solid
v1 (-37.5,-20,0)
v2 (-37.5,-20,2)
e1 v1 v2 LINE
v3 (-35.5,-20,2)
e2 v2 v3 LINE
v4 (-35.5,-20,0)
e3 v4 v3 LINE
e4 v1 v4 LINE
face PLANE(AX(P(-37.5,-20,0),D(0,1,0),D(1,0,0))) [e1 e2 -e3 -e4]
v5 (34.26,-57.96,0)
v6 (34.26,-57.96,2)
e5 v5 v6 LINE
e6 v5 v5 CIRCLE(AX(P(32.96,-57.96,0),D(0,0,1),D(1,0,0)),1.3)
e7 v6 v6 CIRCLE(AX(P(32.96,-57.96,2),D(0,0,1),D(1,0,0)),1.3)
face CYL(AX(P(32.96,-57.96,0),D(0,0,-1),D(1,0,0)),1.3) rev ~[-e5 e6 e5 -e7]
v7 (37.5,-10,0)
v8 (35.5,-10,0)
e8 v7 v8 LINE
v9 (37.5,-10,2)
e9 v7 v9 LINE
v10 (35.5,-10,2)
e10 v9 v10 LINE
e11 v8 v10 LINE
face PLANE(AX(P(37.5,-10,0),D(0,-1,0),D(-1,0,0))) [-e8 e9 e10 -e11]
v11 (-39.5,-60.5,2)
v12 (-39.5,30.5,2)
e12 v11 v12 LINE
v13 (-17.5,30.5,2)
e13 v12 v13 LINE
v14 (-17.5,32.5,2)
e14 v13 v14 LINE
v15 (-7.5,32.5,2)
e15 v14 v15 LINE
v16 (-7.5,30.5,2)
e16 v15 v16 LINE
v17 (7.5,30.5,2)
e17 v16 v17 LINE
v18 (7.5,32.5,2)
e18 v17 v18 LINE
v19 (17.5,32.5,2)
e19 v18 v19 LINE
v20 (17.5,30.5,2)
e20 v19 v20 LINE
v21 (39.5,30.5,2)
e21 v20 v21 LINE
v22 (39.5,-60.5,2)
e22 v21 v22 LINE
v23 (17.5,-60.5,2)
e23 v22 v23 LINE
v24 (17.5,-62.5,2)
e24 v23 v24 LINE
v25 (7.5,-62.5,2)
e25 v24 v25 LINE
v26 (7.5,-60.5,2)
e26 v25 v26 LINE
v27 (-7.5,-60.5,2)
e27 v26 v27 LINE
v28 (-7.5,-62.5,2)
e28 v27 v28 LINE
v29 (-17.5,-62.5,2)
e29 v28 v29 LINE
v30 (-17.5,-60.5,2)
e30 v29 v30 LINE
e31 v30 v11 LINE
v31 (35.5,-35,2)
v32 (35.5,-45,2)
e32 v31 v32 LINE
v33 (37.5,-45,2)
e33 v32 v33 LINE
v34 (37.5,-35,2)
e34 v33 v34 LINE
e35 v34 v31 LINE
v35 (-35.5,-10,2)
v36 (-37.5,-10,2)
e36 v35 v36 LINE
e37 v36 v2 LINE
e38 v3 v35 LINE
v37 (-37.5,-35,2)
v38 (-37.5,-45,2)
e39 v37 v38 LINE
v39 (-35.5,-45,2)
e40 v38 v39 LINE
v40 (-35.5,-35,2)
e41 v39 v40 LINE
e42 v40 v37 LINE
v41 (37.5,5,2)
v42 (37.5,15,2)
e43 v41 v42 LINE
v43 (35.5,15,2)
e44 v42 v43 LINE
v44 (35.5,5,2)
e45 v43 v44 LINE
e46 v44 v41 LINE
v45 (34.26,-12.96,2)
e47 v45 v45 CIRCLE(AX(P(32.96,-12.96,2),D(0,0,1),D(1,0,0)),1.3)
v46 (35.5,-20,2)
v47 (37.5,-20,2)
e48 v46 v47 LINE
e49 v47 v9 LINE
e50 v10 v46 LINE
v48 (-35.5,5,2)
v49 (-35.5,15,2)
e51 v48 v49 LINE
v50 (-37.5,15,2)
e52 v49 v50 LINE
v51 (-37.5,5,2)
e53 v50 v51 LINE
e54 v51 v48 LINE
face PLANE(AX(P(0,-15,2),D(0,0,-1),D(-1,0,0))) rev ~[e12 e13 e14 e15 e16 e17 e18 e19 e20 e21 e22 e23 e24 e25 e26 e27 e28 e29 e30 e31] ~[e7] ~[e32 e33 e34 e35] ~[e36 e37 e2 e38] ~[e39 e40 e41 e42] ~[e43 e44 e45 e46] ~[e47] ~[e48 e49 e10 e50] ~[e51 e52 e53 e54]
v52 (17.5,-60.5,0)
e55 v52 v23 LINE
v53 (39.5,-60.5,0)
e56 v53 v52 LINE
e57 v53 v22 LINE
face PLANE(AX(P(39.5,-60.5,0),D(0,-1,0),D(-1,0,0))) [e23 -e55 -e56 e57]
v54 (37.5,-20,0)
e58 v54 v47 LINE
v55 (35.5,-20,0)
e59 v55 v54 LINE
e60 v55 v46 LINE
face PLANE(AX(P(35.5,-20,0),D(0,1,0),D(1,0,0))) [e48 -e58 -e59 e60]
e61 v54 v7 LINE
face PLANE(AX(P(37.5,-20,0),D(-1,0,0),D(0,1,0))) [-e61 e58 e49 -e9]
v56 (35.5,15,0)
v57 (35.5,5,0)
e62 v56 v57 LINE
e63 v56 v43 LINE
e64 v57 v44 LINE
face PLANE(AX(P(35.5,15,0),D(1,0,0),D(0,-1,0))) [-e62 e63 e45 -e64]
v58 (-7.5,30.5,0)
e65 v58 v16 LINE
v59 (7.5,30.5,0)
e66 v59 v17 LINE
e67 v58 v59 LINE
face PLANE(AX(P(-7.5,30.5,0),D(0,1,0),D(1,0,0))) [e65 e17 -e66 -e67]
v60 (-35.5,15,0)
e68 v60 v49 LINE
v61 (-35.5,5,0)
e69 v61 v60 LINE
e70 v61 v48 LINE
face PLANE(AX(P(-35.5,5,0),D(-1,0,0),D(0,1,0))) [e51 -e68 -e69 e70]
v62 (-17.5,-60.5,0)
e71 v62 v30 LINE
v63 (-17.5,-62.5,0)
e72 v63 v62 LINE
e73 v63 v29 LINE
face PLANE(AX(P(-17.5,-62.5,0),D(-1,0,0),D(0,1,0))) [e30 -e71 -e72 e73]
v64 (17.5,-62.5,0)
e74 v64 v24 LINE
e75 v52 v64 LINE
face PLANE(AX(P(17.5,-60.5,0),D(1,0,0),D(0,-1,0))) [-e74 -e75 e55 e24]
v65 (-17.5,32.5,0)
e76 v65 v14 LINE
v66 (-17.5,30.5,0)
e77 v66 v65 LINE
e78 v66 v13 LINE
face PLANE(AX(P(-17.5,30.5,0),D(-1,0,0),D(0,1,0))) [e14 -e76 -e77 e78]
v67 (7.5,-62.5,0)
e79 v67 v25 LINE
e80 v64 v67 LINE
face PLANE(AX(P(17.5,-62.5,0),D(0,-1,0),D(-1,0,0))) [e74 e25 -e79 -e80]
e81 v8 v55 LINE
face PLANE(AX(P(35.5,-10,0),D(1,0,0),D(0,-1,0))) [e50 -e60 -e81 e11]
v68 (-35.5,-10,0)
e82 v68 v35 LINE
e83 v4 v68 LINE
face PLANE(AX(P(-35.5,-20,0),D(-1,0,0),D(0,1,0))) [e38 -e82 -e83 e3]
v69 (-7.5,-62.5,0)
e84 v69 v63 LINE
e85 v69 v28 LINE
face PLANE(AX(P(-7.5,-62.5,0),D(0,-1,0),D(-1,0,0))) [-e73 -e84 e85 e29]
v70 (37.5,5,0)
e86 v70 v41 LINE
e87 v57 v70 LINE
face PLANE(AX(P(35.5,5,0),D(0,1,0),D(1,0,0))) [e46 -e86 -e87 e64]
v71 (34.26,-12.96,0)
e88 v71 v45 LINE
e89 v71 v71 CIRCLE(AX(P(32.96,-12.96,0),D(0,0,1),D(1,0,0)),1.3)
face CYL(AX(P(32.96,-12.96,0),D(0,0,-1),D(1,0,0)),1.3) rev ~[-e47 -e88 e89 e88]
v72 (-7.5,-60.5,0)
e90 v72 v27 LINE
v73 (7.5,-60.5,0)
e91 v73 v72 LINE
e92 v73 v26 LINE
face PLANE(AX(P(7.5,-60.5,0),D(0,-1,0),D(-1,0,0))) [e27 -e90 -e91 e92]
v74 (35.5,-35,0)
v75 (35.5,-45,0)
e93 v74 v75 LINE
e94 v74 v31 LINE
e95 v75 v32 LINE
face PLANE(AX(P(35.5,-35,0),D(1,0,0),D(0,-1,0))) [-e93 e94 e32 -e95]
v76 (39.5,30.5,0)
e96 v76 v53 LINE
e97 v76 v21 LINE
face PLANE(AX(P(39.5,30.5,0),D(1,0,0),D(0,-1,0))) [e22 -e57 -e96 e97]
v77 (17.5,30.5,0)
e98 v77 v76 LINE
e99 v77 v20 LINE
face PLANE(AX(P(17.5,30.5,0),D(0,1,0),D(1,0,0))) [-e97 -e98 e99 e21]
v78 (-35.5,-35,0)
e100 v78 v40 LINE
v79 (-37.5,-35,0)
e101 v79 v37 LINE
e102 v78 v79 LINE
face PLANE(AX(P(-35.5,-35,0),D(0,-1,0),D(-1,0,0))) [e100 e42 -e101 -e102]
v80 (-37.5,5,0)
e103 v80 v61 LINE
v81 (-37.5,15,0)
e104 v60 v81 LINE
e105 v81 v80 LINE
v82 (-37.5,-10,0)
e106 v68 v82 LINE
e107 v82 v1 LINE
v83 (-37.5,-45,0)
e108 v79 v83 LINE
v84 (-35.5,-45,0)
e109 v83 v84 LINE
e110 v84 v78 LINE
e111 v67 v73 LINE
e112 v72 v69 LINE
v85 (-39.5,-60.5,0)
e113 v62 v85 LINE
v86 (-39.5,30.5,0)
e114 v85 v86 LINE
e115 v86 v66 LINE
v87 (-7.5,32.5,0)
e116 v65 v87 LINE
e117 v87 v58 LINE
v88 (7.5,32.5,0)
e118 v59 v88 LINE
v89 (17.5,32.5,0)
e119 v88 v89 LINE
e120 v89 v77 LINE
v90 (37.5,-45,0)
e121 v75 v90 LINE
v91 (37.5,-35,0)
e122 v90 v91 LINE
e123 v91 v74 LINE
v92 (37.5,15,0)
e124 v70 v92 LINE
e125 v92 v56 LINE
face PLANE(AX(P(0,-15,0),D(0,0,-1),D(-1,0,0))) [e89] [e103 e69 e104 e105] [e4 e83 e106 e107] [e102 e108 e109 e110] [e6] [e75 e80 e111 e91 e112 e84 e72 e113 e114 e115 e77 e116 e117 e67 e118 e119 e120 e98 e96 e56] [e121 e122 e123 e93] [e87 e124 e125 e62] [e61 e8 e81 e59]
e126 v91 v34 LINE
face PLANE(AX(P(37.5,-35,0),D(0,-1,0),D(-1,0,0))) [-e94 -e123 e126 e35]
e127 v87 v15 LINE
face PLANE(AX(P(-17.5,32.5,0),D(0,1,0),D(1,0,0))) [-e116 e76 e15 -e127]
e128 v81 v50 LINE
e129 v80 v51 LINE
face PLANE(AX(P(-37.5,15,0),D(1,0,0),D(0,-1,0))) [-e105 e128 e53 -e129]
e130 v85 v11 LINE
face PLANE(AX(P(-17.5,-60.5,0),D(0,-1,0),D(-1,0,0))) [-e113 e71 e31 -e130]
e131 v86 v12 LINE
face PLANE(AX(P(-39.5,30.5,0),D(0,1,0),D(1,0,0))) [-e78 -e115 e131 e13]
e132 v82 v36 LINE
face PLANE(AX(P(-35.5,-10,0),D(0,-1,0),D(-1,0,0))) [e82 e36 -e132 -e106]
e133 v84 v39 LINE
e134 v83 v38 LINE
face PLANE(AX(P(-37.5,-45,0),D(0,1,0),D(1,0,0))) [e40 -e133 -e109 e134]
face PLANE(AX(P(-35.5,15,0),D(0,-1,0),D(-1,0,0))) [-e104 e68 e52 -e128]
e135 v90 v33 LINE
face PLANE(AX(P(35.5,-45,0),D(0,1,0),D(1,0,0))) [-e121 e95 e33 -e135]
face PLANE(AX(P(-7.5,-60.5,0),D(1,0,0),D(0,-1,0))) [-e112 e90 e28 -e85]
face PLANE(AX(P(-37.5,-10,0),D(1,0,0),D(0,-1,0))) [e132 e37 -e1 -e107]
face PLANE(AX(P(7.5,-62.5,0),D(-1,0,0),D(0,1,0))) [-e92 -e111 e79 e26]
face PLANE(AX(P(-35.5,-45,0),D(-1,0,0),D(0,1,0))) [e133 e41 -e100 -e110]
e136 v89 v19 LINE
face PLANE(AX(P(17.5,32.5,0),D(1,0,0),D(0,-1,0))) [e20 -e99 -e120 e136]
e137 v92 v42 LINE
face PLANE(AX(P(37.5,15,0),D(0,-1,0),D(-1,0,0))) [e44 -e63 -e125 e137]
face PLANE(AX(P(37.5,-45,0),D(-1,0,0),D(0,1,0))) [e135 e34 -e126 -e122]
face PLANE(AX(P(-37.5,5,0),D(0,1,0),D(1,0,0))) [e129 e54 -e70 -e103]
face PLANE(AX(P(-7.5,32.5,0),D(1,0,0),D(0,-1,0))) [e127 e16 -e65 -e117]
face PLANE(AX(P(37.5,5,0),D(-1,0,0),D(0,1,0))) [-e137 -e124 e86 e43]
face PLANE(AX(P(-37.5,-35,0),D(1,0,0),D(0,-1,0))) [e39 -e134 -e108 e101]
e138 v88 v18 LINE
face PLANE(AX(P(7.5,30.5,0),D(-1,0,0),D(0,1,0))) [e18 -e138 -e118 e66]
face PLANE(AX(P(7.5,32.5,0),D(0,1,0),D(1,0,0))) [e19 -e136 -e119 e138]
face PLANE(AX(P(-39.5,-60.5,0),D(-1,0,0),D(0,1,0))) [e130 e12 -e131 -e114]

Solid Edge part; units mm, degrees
sketch "Sketch1" plane through (0, 0, 0) normal (0, 0, 1) x (1, 0, 0)
  line L0 (7.5, -60.5) -> (-7.5, -60.5)
  line L1 (-7.5, -60.5) -> (-7.5, -62.5)
  line L2 (-7.5, -62.5) -> (-17.5, -62.5)
  line L3 (-17.5, -62.5) -> (-17.5, -60.5)
  line L4 (-17.5, -60.5) -> (-39.5, -60.5)
  line L5 (-39.5, -60.5) -> (-39.5, 30.5)
  line L6 (-39.5, 30.5) -> (-17.5, 30.5)
  line L7 (-17.5, 30.5) -> (-17.5, 32.5)
  line L8 (-17.5, 32.5) -> (-7.5, 32.5)
  line L9 (-7.5, 32.5) -> (-7.5, 30.5)
  line L10 (-7.5, 30.5) -> (7.5, 30.5)
  line L11 (7.5, 30.5) -> (7.5, 32.5)
  line L12 (7.5, 32.5) -> (17.5, 32.5)
  line L13 (17.5, 32.5) -> (17.5, 30.5)
  line L14 (17.5, 30.5) -> (39.5, 30.5)
  line L15 (39.5, 30.5) -> (39.5, -60.5)
  line L16 (39.5, -60.5) -> (17.5, -60.5)
  line L17 (17.5, -60.5) -> (17.5, -62.5)
  line L18 (17.5, -62.5) -> (7.5, -62.5)
  line L19 (7.5, -62.5) -> (7.5, -60.5)
  line L20 (37.5, -45) -> (37.5, -35)
  line L21 (35.5, -45) -> (37.5, -45)
  line L22 (35.5, -35) -> (35.5, -45)
  line L23 (37.5, -35) -> (35.5, -35)
  line L24 (-35.5, -20) -> (-35.5, -10)
  line L25 (-37.5, -20) -> (-35.5, -20)
  line L26 (-37.5, -10) -> (-37.5, -20)
  line L27 (-35.5, -10) -> (-37.5, -10)
  line L28 (-37.5, -35) -> (-37.5, -45)
  line L29 (-35.5, -35) -> (-37.5, -35)
  line L30 (-35.5, -45) -> (-35.5, -35)
  line L31 (-37.5, -45) -> (-35.5, -45)
  line L32 (35.5, 5) -> (37.5, 5)
  line L33 (35.5, 15) -> (35.5, 5)
  line L34 (37.5, 15) -> (35.5, 15)
  line L35 (37.5, 5) -> (37.5, 15)
  circle A0 centre (32.96, -12.96) radius 1.3
  circle A1 centre (32.96, -57.96) radius 1.3
  line L36 (-37.5, 5) -> (-35.5, 5)
  line L37 (-37.5, 15) -> (-37.5, 5)
  line L38 (-35.5, 15) -> (-37.5, 15)
  line L39 (-35.5, 5) -> (-35.5, 15)
  line L40 (35.5, -10) -> (35.5, -20)
  line L41 (37.5, -10) -> (35.5, -10)
  line L42 (37.5, -20) -> (37.5, -10)
  line L43 (35.5, -20) -> (37.5, -20)
extrude "ExtrudedProtrusion_1" add sketch "Sketch1" along normal blind 2
properties material "Acrylic, high impact grade"
